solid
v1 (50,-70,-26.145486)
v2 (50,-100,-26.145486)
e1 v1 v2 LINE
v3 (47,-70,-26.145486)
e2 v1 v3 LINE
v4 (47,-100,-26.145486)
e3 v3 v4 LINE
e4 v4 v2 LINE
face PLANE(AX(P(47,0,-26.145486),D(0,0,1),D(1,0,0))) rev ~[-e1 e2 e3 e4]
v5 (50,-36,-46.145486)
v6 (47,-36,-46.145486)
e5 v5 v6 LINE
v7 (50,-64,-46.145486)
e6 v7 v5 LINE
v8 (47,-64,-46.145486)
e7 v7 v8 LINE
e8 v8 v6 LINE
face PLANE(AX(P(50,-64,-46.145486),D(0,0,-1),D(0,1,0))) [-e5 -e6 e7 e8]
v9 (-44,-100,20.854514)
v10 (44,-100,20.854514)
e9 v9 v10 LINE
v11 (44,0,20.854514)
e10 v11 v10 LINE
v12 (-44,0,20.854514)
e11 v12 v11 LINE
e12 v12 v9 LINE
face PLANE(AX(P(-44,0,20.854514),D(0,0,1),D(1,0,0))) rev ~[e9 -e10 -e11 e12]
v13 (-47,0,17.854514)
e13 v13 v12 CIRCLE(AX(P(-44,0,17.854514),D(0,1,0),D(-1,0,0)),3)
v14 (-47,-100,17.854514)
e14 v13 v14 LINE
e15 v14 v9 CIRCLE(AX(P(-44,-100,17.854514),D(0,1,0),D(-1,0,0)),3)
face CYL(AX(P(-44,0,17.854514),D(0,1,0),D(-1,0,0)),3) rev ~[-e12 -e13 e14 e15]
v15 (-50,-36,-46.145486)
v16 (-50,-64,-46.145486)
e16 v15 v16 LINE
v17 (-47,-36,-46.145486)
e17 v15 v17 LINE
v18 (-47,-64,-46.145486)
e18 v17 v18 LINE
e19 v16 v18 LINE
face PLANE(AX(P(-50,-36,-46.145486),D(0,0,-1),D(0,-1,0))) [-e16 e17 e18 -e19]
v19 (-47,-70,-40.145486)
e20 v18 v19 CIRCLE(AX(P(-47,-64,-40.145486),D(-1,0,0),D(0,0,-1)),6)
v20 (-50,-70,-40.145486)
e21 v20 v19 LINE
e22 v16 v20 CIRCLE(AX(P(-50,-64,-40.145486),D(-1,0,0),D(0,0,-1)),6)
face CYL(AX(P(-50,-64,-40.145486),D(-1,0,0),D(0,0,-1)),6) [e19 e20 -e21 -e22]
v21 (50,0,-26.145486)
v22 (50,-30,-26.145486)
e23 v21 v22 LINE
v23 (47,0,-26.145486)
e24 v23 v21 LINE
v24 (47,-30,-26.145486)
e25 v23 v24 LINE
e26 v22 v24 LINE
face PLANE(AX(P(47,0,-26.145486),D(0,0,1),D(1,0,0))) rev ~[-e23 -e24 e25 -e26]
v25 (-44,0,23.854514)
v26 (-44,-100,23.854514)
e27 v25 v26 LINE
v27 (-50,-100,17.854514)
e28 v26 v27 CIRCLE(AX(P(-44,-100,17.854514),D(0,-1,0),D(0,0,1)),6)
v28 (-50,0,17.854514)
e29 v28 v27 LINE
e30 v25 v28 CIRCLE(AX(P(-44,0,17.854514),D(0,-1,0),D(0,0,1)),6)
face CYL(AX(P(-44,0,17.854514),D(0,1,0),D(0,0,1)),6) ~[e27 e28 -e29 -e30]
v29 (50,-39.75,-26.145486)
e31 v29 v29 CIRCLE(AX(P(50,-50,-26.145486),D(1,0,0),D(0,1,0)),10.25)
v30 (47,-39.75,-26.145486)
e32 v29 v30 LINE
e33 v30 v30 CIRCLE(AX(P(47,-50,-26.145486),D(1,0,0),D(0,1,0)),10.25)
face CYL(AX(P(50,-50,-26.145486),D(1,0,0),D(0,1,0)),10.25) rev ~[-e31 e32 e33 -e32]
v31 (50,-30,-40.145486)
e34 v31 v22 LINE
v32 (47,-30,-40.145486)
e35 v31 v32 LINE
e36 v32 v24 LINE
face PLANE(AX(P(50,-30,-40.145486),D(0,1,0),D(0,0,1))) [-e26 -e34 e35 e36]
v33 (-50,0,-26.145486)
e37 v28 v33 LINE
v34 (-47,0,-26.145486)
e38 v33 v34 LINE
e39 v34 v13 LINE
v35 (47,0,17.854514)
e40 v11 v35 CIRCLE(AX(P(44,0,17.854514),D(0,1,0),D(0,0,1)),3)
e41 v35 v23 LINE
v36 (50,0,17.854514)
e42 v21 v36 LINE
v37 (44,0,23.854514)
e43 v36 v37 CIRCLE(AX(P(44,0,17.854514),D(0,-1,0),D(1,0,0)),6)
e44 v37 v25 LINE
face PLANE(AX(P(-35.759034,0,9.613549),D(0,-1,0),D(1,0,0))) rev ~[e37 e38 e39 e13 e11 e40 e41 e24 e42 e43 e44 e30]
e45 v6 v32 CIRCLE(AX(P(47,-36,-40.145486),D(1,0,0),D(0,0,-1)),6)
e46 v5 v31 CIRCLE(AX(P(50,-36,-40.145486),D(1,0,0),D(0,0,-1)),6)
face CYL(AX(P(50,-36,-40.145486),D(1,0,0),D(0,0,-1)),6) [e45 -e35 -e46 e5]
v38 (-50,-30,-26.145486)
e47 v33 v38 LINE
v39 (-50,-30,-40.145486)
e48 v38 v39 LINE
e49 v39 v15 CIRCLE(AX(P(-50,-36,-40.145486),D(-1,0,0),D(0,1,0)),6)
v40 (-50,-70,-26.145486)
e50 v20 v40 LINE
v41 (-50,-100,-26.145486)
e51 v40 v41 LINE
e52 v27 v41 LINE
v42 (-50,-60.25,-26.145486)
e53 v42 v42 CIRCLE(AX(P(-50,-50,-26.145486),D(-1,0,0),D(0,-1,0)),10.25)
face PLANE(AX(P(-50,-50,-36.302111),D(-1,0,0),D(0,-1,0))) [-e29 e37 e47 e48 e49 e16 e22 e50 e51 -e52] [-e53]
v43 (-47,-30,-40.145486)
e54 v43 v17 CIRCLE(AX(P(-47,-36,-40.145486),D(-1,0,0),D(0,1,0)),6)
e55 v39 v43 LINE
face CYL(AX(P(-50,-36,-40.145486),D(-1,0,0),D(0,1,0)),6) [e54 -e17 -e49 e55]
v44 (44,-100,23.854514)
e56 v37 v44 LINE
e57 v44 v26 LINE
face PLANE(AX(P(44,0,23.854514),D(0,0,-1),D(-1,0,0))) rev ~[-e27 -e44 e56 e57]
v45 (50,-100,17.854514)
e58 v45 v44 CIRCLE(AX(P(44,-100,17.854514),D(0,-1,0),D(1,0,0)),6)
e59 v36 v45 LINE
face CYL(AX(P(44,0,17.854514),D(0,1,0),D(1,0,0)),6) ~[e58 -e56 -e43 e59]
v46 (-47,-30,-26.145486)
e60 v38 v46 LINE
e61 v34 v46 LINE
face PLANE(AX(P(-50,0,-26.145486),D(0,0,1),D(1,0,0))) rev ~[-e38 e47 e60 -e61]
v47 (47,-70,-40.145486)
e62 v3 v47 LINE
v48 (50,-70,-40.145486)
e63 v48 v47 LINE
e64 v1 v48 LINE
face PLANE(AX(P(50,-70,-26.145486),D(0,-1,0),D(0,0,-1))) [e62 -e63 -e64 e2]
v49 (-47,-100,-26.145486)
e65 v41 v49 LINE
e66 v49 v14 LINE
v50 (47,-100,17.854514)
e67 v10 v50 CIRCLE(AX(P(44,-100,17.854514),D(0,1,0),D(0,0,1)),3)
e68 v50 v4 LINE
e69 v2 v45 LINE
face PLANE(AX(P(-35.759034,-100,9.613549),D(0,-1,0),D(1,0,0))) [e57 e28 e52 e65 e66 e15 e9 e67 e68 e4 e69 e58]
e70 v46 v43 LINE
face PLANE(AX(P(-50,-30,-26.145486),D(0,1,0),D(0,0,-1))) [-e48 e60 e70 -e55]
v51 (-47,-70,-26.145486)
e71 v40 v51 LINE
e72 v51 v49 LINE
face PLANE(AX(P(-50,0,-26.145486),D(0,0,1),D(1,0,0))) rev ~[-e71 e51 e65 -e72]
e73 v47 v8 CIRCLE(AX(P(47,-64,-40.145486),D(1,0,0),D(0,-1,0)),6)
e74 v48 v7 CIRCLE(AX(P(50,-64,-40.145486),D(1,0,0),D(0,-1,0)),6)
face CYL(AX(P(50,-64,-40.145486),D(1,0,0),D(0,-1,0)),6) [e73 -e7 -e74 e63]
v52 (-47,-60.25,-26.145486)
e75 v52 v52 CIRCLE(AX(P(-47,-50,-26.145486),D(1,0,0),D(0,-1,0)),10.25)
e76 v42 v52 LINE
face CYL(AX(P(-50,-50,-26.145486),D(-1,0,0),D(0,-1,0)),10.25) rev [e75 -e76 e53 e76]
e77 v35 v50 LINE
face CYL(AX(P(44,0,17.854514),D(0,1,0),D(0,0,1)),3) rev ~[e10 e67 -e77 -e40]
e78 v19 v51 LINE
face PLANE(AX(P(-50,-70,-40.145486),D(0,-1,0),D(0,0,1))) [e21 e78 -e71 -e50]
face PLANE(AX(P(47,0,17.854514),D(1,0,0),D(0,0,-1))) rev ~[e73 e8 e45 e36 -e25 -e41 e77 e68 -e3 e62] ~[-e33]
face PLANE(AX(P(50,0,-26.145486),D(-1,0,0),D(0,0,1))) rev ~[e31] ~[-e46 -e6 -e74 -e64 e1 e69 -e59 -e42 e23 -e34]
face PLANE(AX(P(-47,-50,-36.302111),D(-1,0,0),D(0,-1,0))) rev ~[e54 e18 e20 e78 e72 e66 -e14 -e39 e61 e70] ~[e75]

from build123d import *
from build123d import SkipClean  # not in build123d's __all__

# Parameters (mm, degrees)
F1_DEPTH = 100
F3_DEPTH = 3
F4_DEPTH = 3
F6_DEPTH = 3
F7_R     = 10.25
F8_DEPTH = 3


# Not quite as in the source:
# - a feature names something its author has since deleted; it is built from what else it names


with BuildPart() as f1:
    # F0 (on Front) → F1 (new body)
    with BuildSketch(Plane.XZ):
        with BuildLine():
            Line((-44, 20.8545142158), (0, 20.8545142158))
            Line((0, 20.8545142158), (0, 23.8545142158))
            Line((0, 23.8545142158), (-44, 23.8545142158))
            ThreePointArc((-44, 23.8545142158), (-48.2426406871, 22.0971549029), (-50, 17.8545142158))
            Line((-50, 17.8545142158), (-50, -26.1454857842))
            Line((-50, -26.1454857842), (-47, -26.1454857842))
            Line((-47, -26.1454857842), (-47, 17.8545142158))
            ThreePointArc((-47, 17.8545142158), (-46.1213203436, 19.9758345594), (-44, 20.8545142158))
        make_face()
        with BuildLine():
            Line((0, 23.8545142158), (0, 20.8545142158))
            Line((0, 20.8545142158), (44, 20.8545142158))
            ThreePointArc((44, 20.8545142158), (46.1213203436, 19.9758345594), (47, 17.8545142158))
            Line((47, 17.8545142158), (47, -26.1454857842))
            Line((47, -26.1454857842), (50, -26.1454857842))
            Line((50, -26.1454857842), (50, 17.8545142158))
            ThreePointArc((50, 17.8545142158), (48.2426406871, 22.0971549029), (44, 23.8545142158))
            Line((44, 23.8545142158), (0, 23.8545142158))
        make_face()
    extrude(amount=F1_DEPTH)

    # F2 (on face) → F3 (cut)
    with BuildSketch(Plane(origin=(-50, 0, 0), x_dir=(0, -1, 0), z_dir=(-1, 0, 0))):
        with BuildLine():
            Line((39.75, -26.1454857842), (60.25, -26.1454857842))
            ThreePointArc((60.25, -26.1454857842), (50, -15.8954857842), (39.75, -26.1454857842))
        make_face()
    extrude(amount=-F3_DEPTH, mode=Mode.SUBTRACT)

    # F2 (on face) → F4 (join)
    with BuildSketch(Plane(origin=(-50, 0, 0), x_dir=(0, -1, 0), z_dir=(-1, 0, 0))):
        with BuildLine():
            Line((70, -26.1454857842), (60.25, -26.1454857842))
            ThreePointArc((60.25, -26.1454857842), (50, -36.3954857842), (39.75, -26.1454857842))
            Line((39.75, -26.1454857842), (30, -26.1454857842))
            Line((30, -26.1454857842), (30, -40.1454857842))
            ThreePointArc((30, -40.1454857842), (31.7573593129, -44.3881264713), (36, -46.1454857842))
            Line((36, -46.1454857842), (64, -46.1454857842))
            ThreePointArc((64, -46.1454857842), (68.2426406871, -44.3881264713), (70, -40.1454857842))
            Line((70, -40.1454857842), (70, -26.1454857842))
        make_face()
    with SkipClean():  # cleaning this boolean's faces spoils the solid; the shape is the same uncleaned
        extrude(amount=-F4_DEPTH)

    # F5 (on face) → F6 (join)
    with BuildSketch(Plane.YZ.offset(50)):
        with BuildLine():
            Line((-30, -26.1454857842), (-70, -26.1454857842))
            Line((-70, -26.1454857842), (-70, -40.1454857842))
            ThreePointArc((-70, -40.1454857842), (-68.2426406871, -44.3881264713), (-64, -46.1454857842))
            Line((-64, -46.1454857842), (-36, -46.1454857842))
            ThreePointArc((-36, -46.1454857842), (-31.7573593129, -44.3881264713), (-30, -40.1454857842))
            Line((-30, -40.1454857842), (-30, -26.1454857842))
        make_face()
    extrude(amount=-F6_DEPTH)

    # F7 (on face) → F8 (cut)
    with BuildSketch(Plane.YZ.offset(50)):
        with Locations((-50, -26.1454857842)):
            Circle(F7_R)
    extrude(amount=-F8_DEPTH, mode=Mode.SUBTRACT)


solid = f1.part
